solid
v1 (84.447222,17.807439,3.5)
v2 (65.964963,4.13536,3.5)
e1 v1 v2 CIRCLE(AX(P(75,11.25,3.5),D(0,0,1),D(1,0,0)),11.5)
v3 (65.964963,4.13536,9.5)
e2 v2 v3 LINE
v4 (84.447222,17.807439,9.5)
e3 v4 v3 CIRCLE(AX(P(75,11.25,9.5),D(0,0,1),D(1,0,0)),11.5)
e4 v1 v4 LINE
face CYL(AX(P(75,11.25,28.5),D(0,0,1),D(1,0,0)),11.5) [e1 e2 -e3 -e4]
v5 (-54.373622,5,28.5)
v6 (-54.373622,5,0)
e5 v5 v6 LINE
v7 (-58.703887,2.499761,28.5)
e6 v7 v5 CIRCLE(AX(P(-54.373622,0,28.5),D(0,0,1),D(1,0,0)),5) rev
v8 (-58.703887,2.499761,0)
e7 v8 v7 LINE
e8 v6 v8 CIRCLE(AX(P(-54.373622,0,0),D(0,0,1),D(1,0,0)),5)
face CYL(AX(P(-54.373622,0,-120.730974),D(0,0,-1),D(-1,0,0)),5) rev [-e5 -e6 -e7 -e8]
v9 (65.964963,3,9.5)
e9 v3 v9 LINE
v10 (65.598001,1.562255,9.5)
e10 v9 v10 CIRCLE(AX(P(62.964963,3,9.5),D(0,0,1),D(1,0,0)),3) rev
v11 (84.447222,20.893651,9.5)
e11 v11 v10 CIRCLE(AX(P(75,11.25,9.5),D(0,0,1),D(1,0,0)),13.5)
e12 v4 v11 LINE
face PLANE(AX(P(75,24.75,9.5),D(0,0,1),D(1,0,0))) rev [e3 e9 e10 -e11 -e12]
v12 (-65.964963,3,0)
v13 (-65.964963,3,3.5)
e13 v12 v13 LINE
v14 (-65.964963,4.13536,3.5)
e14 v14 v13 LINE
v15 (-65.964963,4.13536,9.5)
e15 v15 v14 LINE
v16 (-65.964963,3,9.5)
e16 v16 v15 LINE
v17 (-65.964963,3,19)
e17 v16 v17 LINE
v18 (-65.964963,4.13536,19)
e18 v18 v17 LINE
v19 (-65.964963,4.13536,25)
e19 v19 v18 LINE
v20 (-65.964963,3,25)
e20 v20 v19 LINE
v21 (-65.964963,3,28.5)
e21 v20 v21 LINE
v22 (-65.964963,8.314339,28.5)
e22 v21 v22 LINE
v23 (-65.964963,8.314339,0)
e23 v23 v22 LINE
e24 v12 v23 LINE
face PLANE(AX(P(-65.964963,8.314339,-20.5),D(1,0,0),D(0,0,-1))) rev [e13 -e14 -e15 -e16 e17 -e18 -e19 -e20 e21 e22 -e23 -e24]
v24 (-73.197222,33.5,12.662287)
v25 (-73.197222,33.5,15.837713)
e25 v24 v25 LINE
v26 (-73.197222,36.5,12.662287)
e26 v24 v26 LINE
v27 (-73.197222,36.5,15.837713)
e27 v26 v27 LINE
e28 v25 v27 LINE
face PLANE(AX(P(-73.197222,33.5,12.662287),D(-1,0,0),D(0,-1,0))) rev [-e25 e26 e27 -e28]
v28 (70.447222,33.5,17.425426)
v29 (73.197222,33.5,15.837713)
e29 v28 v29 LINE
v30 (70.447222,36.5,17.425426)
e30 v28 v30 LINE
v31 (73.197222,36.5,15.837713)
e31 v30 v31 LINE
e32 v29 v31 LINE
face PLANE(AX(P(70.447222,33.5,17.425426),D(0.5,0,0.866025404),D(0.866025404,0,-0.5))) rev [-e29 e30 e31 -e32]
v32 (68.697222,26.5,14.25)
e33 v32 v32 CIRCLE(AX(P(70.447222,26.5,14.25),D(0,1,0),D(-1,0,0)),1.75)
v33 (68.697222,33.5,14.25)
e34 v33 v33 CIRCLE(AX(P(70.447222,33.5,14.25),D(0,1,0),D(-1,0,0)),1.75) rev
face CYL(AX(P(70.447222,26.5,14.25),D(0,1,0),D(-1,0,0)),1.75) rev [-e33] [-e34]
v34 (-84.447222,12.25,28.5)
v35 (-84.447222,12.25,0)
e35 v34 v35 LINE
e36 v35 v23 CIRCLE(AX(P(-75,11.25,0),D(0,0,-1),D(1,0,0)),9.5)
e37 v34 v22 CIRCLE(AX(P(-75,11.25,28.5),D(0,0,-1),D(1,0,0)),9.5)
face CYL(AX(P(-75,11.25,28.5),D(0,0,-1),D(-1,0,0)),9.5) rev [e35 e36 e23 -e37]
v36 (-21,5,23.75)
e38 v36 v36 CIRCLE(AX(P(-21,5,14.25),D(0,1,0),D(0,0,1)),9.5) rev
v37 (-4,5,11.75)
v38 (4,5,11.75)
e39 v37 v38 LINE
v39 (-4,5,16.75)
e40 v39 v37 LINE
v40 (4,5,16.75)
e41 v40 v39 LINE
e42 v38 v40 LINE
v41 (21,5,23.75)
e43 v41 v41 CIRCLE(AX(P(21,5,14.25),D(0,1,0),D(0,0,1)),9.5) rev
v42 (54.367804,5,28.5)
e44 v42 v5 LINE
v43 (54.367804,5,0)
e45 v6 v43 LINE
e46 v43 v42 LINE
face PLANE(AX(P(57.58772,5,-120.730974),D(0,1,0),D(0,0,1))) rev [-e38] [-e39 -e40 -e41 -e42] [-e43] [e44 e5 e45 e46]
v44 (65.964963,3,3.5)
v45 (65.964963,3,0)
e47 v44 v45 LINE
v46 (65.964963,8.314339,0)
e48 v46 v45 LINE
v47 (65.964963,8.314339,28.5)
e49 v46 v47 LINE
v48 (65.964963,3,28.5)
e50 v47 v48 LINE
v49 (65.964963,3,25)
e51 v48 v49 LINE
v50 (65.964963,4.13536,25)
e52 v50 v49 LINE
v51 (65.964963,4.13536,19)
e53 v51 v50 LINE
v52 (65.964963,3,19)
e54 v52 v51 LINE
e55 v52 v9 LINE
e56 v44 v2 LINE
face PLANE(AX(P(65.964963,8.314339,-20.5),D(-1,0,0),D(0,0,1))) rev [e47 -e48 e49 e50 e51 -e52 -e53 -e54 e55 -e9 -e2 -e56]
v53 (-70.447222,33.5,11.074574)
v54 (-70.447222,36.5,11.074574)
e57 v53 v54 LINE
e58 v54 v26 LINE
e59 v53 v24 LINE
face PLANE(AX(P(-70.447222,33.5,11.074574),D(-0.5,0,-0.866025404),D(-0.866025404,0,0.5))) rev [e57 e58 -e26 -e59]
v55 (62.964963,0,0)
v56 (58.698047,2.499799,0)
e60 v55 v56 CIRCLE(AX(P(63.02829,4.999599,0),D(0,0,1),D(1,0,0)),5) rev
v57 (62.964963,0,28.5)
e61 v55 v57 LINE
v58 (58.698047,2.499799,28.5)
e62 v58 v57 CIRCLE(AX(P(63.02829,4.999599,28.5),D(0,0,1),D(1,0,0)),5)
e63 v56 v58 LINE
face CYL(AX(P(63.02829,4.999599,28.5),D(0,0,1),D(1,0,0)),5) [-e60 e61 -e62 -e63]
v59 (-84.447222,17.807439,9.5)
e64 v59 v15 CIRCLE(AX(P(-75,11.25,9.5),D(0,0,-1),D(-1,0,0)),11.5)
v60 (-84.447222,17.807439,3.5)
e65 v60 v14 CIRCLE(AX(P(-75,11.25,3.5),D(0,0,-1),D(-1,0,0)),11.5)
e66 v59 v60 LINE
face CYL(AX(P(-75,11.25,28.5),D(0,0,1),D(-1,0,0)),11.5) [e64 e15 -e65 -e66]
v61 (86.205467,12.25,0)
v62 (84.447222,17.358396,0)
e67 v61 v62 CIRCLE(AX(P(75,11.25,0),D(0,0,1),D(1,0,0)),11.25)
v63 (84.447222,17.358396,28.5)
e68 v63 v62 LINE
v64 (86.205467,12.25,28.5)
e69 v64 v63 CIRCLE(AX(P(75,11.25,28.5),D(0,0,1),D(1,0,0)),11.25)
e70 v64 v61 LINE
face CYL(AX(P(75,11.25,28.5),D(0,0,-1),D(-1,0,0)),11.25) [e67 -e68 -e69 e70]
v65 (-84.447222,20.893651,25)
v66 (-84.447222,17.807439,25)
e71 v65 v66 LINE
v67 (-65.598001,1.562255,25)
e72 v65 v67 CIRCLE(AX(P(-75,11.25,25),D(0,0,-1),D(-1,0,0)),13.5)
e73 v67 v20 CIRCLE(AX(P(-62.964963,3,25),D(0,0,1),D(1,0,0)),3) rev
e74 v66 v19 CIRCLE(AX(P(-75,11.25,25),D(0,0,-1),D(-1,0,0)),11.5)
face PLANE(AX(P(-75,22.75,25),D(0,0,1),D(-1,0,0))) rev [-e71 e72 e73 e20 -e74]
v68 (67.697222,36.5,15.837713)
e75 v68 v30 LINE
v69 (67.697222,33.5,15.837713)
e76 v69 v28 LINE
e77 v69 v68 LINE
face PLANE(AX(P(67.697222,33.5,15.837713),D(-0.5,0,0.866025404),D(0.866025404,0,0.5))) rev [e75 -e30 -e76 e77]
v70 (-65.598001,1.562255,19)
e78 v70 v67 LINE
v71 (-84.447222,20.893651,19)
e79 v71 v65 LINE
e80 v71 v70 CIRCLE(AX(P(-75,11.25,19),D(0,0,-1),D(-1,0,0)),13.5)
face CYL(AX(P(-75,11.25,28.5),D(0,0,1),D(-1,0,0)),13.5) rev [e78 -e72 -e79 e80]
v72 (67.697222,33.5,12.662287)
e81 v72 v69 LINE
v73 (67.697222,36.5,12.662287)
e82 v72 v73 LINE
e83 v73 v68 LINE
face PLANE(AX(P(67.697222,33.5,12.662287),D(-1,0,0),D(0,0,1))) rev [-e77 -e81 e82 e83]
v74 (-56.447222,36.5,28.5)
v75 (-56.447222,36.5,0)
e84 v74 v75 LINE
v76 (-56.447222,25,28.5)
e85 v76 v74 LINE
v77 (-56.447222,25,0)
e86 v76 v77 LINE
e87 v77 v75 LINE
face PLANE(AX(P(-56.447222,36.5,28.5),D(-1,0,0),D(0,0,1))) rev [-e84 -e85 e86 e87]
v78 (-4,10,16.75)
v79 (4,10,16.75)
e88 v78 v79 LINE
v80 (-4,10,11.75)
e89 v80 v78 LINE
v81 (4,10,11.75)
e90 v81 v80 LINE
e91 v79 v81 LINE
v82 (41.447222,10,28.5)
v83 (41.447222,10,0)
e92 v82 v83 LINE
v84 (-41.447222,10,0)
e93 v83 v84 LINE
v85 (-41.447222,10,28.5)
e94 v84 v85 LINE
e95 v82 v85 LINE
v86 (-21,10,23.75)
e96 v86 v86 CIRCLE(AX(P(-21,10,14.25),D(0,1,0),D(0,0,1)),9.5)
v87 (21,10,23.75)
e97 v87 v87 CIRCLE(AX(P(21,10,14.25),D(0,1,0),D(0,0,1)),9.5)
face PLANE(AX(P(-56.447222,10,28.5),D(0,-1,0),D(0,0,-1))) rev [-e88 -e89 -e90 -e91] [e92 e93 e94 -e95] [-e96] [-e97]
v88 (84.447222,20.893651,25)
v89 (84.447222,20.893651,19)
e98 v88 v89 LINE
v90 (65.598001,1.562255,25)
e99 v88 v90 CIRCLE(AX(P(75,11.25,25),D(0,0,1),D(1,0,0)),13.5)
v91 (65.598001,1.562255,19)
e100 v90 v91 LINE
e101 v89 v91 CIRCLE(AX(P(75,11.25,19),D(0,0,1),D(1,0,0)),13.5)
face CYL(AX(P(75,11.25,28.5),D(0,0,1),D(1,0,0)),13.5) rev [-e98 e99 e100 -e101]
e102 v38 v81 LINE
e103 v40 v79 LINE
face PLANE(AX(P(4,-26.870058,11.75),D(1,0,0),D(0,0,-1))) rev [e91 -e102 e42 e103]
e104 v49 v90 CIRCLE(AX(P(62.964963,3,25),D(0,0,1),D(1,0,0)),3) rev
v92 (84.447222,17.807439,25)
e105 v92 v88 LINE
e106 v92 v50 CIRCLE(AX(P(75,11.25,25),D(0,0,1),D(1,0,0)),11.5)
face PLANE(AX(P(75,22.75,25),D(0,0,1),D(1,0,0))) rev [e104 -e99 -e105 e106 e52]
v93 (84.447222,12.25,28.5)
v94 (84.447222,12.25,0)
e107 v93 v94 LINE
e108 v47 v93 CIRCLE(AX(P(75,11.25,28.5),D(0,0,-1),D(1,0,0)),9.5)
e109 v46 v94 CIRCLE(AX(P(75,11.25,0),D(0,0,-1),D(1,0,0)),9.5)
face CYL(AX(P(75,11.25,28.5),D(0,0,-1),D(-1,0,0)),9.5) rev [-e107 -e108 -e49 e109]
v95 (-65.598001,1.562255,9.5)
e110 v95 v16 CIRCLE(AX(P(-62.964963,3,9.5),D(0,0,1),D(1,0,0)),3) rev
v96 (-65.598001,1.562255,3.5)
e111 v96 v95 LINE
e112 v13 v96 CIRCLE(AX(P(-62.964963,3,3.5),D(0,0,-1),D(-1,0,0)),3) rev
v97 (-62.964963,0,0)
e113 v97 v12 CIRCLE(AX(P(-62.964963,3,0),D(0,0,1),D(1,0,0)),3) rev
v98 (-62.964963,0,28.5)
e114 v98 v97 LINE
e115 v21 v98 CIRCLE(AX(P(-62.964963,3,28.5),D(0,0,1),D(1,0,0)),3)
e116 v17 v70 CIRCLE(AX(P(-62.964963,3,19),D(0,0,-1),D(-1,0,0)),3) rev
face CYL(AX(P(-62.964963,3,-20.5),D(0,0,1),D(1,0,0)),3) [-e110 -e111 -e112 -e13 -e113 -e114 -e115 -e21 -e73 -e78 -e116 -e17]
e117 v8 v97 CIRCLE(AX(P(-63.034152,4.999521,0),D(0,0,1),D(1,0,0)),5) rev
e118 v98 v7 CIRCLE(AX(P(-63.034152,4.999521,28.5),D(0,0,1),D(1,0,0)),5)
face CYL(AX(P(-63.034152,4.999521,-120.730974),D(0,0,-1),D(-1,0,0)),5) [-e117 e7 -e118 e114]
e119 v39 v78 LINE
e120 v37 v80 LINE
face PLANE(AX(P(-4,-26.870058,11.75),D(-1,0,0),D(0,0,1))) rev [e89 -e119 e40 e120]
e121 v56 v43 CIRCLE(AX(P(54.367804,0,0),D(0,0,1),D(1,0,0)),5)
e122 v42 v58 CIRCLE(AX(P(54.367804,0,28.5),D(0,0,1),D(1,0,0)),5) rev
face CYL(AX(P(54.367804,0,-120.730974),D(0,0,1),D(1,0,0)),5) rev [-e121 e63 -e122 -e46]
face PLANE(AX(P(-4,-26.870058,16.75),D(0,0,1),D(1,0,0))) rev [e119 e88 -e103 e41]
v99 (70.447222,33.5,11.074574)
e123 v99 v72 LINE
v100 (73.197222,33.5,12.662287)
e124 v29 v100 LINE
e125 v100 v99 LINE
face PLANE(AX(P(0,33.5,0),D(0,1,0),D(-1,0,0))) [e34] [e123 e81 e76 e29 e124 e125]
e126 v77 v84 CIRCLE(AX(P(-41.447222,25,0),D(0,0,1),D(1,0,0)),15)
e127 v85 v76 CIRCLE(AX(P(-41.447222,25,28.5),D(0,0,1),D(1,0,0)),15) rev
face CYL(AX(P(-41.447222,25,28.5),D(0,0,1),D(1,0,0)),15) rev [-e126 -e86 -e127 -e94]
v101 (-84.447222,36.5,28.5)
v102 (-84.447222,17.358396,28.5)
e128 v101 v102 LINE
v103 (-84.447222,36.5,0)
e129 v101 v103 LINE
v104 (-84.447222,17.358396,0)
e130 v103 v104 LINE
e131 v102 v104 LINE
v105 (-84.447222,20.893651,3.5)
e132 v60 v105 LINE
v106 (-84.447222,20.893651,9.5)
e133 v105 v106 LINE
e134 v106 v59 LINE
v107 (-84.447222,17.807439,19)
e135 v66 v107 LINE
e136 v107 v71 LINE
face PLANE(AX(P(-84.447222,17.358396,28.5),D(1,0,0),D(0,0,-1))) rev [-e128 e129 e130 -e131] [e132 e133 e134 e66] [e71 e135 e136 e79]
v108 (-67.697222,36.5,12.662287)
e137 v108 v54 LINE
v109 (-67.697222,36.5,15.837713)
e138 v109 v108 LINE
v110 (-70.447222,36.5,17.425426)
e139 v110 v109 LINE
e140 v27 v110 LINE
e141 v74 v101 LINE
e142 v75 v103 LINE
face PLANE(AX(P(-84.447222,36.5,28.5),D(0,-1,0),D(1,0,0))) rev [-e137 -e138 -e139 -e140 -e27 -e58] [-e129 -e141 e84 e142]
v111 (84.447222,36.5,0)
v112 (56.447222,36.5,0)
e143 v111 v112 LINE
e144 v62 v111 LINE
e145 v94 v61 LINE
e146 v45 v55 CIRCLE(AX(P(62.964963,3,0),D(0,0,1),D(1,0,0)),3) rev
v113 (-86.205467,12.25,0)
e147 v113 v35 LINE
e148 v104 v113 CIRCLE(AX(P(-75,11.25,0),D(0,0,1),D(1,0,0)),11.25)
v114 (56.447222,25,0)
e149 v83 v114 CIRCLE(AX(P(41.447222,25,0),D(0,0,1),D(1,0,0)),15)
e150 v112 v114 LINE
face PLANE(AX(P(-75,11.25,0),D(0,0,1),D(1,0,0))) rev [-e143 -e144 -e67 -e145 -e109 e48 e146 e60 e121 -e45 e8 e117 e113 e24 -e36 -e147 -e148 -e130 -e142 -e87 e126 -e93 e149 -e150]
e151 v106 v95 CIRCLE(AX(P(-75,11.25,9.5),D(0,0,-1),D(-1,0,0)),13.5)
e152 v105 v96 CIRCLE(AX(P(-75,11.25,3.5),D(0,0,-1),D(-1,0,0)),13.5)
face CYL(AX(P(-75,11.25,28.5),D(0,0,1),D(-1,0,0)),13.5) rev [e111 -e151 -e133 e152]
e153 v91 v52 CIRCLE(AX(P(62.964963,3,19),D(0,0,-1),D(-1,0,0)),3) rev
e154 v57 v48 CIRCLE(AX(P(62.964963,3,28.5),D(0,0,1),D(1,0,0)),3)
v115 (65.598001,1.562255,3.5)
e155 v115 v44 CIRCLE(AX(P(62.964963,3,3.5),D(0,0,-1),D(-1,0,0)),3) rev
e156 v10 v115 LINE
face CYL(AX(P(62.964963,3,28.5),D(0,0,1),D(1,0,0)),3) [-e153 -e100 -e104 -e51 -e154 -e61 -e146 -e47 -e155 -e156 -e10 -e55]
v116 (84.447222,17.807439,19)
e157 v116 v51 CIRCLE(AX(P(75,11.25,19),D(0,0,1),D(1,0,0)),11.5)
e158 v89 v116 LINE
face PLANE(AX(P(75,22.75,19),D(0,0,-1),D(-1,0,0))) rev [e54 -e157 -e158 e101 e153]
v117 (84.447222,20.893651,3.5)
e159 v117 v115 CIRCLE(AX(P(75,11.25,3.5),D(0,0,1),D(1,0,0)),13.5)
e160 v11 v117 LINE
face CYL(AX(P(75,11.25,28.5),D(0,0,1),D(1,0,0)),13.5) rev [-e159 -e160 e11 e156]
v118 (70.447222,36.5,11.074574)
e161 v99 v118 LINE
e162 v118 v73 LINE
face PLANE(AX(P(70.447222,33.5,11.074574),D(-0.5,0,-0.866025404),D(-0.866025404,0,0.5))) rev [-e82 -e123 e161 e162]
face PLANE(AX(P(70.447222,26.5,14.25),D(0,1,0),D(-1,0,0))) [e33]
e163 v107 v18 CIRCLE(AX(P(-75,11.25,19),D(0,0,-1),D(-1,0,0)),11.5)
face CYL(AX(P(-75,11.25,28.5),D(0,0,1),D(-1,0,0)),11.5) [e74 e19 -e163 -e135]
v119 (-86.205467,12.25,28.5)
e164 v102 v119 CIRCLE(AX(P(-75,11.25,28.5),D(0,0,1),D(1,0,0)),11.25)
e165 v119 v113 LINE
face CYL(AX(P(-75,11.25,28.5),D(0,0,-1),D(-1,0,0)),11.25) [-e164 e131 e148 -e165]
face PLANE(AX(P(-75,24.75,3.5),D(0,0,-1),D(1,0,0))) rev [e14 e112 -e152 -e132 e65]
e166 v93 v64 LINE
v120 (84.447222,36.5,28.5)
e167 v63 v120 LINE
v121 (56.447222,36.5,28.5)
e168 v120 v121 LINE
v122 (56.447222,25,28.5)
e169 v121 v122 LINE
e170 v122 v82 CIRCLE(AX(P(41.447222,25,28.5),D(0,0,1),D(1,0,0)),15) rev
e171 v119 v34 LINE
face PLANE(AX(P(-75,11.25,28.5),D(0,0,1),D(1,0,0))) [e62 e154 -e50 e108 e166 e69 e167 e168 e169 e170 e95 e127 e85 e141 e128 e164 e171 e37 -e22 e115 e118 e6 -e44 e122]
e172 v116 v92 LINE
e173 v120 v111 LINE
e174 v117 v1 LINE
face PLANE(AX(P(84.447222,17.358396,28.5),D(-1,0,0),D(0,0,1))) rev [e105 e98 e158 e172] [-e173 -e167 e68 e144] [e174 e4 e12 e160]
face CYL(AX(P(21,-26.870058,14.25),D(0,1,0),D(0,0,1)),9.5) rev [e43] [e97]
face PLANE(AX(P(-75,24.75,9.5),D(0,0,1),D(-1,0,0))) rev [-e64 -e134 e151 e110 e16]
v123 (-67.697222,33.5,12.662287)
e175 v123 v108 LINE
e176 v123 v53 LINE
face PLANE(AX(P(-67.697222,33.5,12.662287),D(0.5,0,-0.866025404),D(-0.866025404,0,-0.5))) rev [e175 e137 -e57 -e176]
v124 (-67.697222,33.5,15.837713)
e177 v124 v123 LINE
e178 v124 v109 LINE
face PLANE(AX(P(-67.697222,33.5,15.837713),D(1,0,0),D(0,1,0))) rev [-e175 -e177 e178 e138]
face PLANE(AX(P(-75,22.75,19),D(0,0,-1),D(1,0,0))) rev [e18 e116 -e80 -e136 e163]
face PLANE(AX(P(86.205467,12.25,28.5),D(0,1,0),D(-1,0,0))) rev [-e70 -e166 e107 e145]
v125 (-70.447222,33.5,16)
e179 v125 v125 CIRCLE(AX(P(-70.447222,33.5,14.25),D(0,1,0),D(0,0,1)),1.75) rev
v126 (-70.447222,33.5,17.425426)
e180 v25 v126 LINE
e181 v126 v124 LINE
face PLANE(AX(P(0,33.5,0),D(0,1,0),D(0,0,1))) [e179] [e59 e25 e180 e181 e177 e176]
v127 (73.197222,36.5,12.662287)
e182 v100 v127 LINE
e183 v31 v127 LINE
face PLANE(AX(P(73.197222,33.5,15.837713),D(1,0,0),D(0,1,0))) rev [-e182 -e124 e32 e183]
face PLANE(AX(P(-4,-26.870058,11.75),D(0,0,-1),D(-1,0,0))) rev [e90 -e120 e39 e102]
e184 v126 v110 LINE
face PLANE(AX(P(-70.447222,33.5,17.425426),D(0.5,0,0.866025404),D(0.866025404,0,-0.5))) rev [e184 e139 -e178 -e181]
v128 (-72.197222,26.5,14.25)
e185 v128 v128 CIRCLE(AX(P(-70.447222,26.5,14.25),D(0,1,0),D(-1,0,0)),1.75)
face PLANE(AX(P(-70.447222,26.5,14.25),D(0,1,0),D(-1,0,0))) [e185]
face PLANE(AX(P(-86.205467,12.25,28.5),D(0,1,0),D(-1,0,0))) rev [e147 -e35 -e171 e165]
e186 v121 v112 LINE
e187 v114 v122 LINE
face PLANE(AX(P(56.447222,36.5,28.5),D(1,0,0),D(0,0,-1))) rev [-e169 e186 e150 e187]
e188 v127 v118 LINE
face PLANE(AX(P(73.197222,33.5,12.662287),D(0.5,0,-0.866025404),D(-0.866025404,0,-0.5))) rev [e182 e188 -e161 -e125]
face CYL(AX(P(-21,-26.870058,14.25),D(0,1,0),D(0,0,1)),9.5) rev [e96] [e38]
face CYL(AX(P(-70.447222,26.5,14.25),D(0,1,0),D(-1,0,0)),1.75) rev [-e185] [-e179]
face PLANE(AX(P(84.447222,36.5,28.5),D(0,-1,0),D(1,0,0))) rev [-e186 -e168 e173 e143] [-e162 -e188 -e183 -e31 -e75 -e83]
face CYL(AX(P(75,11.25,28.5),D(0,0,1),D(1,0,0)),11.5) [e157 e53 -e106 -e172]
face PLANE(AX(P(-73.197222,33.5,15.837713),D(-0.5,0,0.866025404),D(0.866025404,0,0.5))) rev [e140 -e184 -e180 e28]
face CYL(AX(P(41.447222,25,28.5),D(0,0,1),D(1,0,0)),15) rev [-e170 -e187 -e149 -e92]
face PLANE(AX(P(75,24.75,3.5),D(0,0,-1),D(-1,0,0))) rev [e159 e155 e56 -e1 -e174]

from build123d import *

# Parameters (mm, degrees)
BOSS_EXTRUDE3_DEPTH = 28.5
FILLET1_R           = 15
SKETCH8_R           = 9.5
SKETCH8_W           = 8
SKETCH8_H           = 5
CUT_EXTRUDE4_DEPTH  = 10
SKETCH10_R          = 1.75
CUT_EXTRUDE6_DEPTH  = 10
CUT_EXTRUDE9_DEPTH  = 3
SKETCH17_W          = 6
SKETCH17_H          = 2
CUT_EXTRUDE11_DEPTH = 49
FILLET2_R           = 3
CUT_EXTRUDE12_START = -28.5
CUT_EXTRUDE12_DEPTH = 28.5
FILLET3_R           = 5
FILLET4_R           = 5
FILLET5_START       = -1
FILLET5_DEPTH       = 30


with BuildPart() as part:
    # Sketch7 → Boss-Extrude3 (new body)
    with BuildSketch(Plane.XY):
        with BuildLine():
            Line((-75, 0), (75, 0))
            ThreePointArc((75, 0), (82.593171274, 2.949021142), (86.205467416, 10.25))
            Line((86.205467416, 10.25), (84.447221814, 10.25))
            ThreePointArc((84.447221814, 10.25), (65.5, 11.25), (84.447221814, 12.25))
            Line((84.447221814, 12.25), (86.205467416, 12.25))
            ThreePointArc((86.205467416, 12.25), (85.637542957, 14.911308486), (84.447221814, 17.358395861))
            Line((84.447221814, 17.358395861), (84.447221814, 36.5))
            Line((84.447221814, 36.5), (56.447221814, 36.5))
            Line((56.447221814, 36.5), (56.447221814, 10))
            Line((56.447221814, 10), (-56.447221814, 10))
            Line((-56.447221814, 10), (-56.447221814, 36.5))
            Line((-56.447221814, 36.5), (-84.447221814, 36.5))
            Line((-84.447221814, 36.5), (-84.447221814, 17.358395861))
            ThreePointArc((-84.447221814, 17.358395861), (-85.637542957, 14.911308486), (-86.205467416, 12.25))
            Line((-86.205467416, 12.25), (-84.447221814, 12.25))
            ThreePointArc((-84.447221814, 12.25), (-65.5, 11.25), (-84.447221814, 10.25))
            Line((-84.447221814, 10.25), (-86.205467416, 10.25))
            ThreePointArc((-86.205467416, 10.25), (-82.593171274, 2.949021142), (-75, 0))
        make_face()
    extrude(amount=BOSS_EXTRUDE3_DEPTH)

    # Fillet1
    fillet1_edges = [part.edges().sort_by_distance(p)[0] for p in [
        (-56.447221814, 10, 14.25),
        (56.447221814, 10, 14.25),
    ]]
    fillet(fillet1_edges, radius=FILLET1_R)

    # Sketch8 → Cut-Extrude4 (cut)
    with BuildSketch(Plane(origin=(0, 10, 0), x_dir=(1, 0, 0), z_dir=(0, 1, 0))):
        with Locations(Location((21, -14.25, 0), (0, 0, 270))):
            Circle(SKETCH8_R)
        with Locations(Location((-21, -14.25, 0), (0, 0, 270))):
            Circle(SKETCH8_R)
        with Locations((0, -14.25)):
            Rectangle(SKETCH8_W, SKETCH8_H)
    extrude(amount=-CUT_EXTRUDE4_DEPTH, mode=Mode.SUBTRACT)

    # Sketch10 → Cut-Extrude6 (cut)
    with BuildSketch(Plane(origin=(0, 36.5, 0), x_dir=(1, 0, 0), z_dir=(0, 1, 0))):
        with Locations(Location((70.447221814, -14.25, 0), (0, 0, 180))):
            Circle(SKETCH10_R)
        with Locations(Location((-70.447221814, -14.25, 0), (0, 0, 180))):
            Circle(SKETCH10_R)
    extrude(amount=-CUT_EXTRUDE6_DEPTH, mode=Mode.SUBTRACT)

    # Sketch13 → Cut-Extrude9 (cut)
    with BuildSketch(Plane(origin=(0, 36.5, 0), x_dir=(1, 0, 0), z_dir=(0, 1, 0))):
        Polygon((67.697221814, -12.66228676), (67.697221814, -15.83771324), (70.447221814, -17.425426481), (73.197221814, -15.83771324), (73.197221814, -12.66228676), (70.447221814, -11.074573519), align=None)
        Polygon((-70.447221814, -17.425426481), (-67.697221814, -15.83771324), (-67.697221814, -12.66228676), (-70.447221814, -11.074573519), (-73.197221814, -12.66228676), (-73.197221814, -15.83771324), align=None)
    extrude(amount=-CUT_EXTRUDE9_DEPTH, mode=Mode.SUBTRACT)

    # Sketch17 → Cut-Revolve1 (revolve, cut)
    with BuildSketch(Plane.ZY.offset(-75)):
        with Locations((22, 23.75)):
            Rectangle(SKETCH17_W, SKETCH17_H)
        with Locations((6.5, 23.75)):
            Rectangle(SKETCH17_W, SKETCH17_H)
    cut_revolve1 = revolve(axis=Axis((75, 11.25, 28.5), (0, 0, -1)), mode=Mode.SUBTRACT)

    # Mirror1: Cut-Revolve1 across plane
    add(cut_revolve1.mirror(Plane(origin=(0, 0, 0), x_dir=(0, 0, 1), z_dir=(1, 0, 0))), mode=Mode.SUBTRACT)

    # Sketch18 → Cut-Extrude11 (cut)
    with BuildSketch(Plane.XY.offset(28.5)):
        Polygon((-75, 11.25), (-65.964963095, 8.314338553), (-65.964963095, 0), (-86.964963095, 0), (-86.964963095, 11.25), align=None)
        Polygon((86.964963095, 11.25), (75, 11.25), (65.964963095, 8.314338553), (65.964963095, 0), (86.964963095, 0), align=None)
    extrude(amount=-CUT_EXTRUDE11_DEPTH, mode=Mode.SUBTRACT)

    # Fillet2
    # the kernel refuses this fillet: 3 mm, written as the material it takes off along each edge
    with BuildSketch(Plane(origin=(-65.964963095, 0, 36), x_dir=(1, 0, 0), z_dir=(0, 0, -1)), Plane(origin=(65.964963095, 0, 36), x_dir=(0, 1, 0), z_dir=(0, 0, -1))) as fillet2_piece_1:
        with BuildLine():
            CenterArc((FILLET2_R, -FILLET2_R), FILLET2_R, 90, 90)
            Line((0, -FILLET2_R), (0, 0))
            Line((0, 0), (FILLET2_R, 0))
        make_face()
    extrude(amount=43.5, mode=Mode.SUBTRACT)

    # Sketch20 → Cut-Extrude12 (cut)
    with BuildSketch(Plane.XY.offset(28.5).offset(CUT_EXTRUDE12_START)):
        with BuildLine():
            Line((57.587719851, 5), (-57.587719851, 5))
            ThreePointArc((-57.587719851, 5), (-58.757162737, 2.39447982), (-60.313696857, 0))
            Line((-60.313696857, 0), (60.313696857, 0))
            ThreePointArc((60.313696857, 0), (58.757162737, 2.39447982), (57.587719851, 5))
        make_face()
    extrude(amount=CUT_EXTRUDE12_DEPTH, mode=Mode.SUBTRACT)

    # Fillet3
    # the kernel refuses this fillet: 5 mm, written as the material it takes off along each edge
    with BuildSketch(Plane(origin=(-60.313696857, 0, -7.959028746), x_dir=(0.5375468252695589, 0.8432339003162873, 0), z_dir=(0, 0, 1))) as fillet3_piece_1:
        with BuildLine():
            CenterArc((2.753393728, 4.981456882), FILLET3_R, 213.309669326, 61.62636665)
            Line((-1.425179749, 2.235637571), (-1.508751219, 2.180721184))
            ThreePointArc((-1.508751219, 2.180721184), (-0.796913265, 1.064064103), (-0.08432339, -0.053754683))
            Line((-0.08432339, -0.053754683), (-0.008604355, -0.099629138))
            ThreePointArc((-0.008604355, -0.099629138), (1.591805749, -0.168609535), (3.192215854, -0.099629138))
            Line((3.192215854, -0.099629138), (3.183611498, 0))
        make_face()
    extrude(amount=44.418057492, mode=Mode.SUBTRACT)

    # Fillet4
    fillet4_edges = [part.edges().sort_by_distance(p)[0] for p in [
        (-57.587719851, 5, 14.25),
        (57.587719851, 5, 14.25),
    ]]
    fillet(fillet4_edges, radius=FILLET4_R)

    # Fillet5: read off the stored shape, not the designer's step
    # Fillet5 outline → Fillet5 (cut)
    with BuildSketch(Plane.XY.offset(FILLET5_START)):
        with BuildLine():
            ThreePointArc((62.964963095, 0), (60.500818254, 0.685449294), (58.69804707, 2.499799478))
            ThreePointArc((58.69804707, 2.499799478), (58.728163344, 2.446889634), (58.757633161, 2.393617021))
            ThreePointArc((58.757633161, 2.393617021), (59.489422728, 1.16674692), (60.313696857, 0))
            Line((60.313696857, 0), (62.964963095, 0))
        make_face()
    extrude(amount=FILLET5_DEPTH, mode=Mode.SUBTRACT)


solid = part.part
